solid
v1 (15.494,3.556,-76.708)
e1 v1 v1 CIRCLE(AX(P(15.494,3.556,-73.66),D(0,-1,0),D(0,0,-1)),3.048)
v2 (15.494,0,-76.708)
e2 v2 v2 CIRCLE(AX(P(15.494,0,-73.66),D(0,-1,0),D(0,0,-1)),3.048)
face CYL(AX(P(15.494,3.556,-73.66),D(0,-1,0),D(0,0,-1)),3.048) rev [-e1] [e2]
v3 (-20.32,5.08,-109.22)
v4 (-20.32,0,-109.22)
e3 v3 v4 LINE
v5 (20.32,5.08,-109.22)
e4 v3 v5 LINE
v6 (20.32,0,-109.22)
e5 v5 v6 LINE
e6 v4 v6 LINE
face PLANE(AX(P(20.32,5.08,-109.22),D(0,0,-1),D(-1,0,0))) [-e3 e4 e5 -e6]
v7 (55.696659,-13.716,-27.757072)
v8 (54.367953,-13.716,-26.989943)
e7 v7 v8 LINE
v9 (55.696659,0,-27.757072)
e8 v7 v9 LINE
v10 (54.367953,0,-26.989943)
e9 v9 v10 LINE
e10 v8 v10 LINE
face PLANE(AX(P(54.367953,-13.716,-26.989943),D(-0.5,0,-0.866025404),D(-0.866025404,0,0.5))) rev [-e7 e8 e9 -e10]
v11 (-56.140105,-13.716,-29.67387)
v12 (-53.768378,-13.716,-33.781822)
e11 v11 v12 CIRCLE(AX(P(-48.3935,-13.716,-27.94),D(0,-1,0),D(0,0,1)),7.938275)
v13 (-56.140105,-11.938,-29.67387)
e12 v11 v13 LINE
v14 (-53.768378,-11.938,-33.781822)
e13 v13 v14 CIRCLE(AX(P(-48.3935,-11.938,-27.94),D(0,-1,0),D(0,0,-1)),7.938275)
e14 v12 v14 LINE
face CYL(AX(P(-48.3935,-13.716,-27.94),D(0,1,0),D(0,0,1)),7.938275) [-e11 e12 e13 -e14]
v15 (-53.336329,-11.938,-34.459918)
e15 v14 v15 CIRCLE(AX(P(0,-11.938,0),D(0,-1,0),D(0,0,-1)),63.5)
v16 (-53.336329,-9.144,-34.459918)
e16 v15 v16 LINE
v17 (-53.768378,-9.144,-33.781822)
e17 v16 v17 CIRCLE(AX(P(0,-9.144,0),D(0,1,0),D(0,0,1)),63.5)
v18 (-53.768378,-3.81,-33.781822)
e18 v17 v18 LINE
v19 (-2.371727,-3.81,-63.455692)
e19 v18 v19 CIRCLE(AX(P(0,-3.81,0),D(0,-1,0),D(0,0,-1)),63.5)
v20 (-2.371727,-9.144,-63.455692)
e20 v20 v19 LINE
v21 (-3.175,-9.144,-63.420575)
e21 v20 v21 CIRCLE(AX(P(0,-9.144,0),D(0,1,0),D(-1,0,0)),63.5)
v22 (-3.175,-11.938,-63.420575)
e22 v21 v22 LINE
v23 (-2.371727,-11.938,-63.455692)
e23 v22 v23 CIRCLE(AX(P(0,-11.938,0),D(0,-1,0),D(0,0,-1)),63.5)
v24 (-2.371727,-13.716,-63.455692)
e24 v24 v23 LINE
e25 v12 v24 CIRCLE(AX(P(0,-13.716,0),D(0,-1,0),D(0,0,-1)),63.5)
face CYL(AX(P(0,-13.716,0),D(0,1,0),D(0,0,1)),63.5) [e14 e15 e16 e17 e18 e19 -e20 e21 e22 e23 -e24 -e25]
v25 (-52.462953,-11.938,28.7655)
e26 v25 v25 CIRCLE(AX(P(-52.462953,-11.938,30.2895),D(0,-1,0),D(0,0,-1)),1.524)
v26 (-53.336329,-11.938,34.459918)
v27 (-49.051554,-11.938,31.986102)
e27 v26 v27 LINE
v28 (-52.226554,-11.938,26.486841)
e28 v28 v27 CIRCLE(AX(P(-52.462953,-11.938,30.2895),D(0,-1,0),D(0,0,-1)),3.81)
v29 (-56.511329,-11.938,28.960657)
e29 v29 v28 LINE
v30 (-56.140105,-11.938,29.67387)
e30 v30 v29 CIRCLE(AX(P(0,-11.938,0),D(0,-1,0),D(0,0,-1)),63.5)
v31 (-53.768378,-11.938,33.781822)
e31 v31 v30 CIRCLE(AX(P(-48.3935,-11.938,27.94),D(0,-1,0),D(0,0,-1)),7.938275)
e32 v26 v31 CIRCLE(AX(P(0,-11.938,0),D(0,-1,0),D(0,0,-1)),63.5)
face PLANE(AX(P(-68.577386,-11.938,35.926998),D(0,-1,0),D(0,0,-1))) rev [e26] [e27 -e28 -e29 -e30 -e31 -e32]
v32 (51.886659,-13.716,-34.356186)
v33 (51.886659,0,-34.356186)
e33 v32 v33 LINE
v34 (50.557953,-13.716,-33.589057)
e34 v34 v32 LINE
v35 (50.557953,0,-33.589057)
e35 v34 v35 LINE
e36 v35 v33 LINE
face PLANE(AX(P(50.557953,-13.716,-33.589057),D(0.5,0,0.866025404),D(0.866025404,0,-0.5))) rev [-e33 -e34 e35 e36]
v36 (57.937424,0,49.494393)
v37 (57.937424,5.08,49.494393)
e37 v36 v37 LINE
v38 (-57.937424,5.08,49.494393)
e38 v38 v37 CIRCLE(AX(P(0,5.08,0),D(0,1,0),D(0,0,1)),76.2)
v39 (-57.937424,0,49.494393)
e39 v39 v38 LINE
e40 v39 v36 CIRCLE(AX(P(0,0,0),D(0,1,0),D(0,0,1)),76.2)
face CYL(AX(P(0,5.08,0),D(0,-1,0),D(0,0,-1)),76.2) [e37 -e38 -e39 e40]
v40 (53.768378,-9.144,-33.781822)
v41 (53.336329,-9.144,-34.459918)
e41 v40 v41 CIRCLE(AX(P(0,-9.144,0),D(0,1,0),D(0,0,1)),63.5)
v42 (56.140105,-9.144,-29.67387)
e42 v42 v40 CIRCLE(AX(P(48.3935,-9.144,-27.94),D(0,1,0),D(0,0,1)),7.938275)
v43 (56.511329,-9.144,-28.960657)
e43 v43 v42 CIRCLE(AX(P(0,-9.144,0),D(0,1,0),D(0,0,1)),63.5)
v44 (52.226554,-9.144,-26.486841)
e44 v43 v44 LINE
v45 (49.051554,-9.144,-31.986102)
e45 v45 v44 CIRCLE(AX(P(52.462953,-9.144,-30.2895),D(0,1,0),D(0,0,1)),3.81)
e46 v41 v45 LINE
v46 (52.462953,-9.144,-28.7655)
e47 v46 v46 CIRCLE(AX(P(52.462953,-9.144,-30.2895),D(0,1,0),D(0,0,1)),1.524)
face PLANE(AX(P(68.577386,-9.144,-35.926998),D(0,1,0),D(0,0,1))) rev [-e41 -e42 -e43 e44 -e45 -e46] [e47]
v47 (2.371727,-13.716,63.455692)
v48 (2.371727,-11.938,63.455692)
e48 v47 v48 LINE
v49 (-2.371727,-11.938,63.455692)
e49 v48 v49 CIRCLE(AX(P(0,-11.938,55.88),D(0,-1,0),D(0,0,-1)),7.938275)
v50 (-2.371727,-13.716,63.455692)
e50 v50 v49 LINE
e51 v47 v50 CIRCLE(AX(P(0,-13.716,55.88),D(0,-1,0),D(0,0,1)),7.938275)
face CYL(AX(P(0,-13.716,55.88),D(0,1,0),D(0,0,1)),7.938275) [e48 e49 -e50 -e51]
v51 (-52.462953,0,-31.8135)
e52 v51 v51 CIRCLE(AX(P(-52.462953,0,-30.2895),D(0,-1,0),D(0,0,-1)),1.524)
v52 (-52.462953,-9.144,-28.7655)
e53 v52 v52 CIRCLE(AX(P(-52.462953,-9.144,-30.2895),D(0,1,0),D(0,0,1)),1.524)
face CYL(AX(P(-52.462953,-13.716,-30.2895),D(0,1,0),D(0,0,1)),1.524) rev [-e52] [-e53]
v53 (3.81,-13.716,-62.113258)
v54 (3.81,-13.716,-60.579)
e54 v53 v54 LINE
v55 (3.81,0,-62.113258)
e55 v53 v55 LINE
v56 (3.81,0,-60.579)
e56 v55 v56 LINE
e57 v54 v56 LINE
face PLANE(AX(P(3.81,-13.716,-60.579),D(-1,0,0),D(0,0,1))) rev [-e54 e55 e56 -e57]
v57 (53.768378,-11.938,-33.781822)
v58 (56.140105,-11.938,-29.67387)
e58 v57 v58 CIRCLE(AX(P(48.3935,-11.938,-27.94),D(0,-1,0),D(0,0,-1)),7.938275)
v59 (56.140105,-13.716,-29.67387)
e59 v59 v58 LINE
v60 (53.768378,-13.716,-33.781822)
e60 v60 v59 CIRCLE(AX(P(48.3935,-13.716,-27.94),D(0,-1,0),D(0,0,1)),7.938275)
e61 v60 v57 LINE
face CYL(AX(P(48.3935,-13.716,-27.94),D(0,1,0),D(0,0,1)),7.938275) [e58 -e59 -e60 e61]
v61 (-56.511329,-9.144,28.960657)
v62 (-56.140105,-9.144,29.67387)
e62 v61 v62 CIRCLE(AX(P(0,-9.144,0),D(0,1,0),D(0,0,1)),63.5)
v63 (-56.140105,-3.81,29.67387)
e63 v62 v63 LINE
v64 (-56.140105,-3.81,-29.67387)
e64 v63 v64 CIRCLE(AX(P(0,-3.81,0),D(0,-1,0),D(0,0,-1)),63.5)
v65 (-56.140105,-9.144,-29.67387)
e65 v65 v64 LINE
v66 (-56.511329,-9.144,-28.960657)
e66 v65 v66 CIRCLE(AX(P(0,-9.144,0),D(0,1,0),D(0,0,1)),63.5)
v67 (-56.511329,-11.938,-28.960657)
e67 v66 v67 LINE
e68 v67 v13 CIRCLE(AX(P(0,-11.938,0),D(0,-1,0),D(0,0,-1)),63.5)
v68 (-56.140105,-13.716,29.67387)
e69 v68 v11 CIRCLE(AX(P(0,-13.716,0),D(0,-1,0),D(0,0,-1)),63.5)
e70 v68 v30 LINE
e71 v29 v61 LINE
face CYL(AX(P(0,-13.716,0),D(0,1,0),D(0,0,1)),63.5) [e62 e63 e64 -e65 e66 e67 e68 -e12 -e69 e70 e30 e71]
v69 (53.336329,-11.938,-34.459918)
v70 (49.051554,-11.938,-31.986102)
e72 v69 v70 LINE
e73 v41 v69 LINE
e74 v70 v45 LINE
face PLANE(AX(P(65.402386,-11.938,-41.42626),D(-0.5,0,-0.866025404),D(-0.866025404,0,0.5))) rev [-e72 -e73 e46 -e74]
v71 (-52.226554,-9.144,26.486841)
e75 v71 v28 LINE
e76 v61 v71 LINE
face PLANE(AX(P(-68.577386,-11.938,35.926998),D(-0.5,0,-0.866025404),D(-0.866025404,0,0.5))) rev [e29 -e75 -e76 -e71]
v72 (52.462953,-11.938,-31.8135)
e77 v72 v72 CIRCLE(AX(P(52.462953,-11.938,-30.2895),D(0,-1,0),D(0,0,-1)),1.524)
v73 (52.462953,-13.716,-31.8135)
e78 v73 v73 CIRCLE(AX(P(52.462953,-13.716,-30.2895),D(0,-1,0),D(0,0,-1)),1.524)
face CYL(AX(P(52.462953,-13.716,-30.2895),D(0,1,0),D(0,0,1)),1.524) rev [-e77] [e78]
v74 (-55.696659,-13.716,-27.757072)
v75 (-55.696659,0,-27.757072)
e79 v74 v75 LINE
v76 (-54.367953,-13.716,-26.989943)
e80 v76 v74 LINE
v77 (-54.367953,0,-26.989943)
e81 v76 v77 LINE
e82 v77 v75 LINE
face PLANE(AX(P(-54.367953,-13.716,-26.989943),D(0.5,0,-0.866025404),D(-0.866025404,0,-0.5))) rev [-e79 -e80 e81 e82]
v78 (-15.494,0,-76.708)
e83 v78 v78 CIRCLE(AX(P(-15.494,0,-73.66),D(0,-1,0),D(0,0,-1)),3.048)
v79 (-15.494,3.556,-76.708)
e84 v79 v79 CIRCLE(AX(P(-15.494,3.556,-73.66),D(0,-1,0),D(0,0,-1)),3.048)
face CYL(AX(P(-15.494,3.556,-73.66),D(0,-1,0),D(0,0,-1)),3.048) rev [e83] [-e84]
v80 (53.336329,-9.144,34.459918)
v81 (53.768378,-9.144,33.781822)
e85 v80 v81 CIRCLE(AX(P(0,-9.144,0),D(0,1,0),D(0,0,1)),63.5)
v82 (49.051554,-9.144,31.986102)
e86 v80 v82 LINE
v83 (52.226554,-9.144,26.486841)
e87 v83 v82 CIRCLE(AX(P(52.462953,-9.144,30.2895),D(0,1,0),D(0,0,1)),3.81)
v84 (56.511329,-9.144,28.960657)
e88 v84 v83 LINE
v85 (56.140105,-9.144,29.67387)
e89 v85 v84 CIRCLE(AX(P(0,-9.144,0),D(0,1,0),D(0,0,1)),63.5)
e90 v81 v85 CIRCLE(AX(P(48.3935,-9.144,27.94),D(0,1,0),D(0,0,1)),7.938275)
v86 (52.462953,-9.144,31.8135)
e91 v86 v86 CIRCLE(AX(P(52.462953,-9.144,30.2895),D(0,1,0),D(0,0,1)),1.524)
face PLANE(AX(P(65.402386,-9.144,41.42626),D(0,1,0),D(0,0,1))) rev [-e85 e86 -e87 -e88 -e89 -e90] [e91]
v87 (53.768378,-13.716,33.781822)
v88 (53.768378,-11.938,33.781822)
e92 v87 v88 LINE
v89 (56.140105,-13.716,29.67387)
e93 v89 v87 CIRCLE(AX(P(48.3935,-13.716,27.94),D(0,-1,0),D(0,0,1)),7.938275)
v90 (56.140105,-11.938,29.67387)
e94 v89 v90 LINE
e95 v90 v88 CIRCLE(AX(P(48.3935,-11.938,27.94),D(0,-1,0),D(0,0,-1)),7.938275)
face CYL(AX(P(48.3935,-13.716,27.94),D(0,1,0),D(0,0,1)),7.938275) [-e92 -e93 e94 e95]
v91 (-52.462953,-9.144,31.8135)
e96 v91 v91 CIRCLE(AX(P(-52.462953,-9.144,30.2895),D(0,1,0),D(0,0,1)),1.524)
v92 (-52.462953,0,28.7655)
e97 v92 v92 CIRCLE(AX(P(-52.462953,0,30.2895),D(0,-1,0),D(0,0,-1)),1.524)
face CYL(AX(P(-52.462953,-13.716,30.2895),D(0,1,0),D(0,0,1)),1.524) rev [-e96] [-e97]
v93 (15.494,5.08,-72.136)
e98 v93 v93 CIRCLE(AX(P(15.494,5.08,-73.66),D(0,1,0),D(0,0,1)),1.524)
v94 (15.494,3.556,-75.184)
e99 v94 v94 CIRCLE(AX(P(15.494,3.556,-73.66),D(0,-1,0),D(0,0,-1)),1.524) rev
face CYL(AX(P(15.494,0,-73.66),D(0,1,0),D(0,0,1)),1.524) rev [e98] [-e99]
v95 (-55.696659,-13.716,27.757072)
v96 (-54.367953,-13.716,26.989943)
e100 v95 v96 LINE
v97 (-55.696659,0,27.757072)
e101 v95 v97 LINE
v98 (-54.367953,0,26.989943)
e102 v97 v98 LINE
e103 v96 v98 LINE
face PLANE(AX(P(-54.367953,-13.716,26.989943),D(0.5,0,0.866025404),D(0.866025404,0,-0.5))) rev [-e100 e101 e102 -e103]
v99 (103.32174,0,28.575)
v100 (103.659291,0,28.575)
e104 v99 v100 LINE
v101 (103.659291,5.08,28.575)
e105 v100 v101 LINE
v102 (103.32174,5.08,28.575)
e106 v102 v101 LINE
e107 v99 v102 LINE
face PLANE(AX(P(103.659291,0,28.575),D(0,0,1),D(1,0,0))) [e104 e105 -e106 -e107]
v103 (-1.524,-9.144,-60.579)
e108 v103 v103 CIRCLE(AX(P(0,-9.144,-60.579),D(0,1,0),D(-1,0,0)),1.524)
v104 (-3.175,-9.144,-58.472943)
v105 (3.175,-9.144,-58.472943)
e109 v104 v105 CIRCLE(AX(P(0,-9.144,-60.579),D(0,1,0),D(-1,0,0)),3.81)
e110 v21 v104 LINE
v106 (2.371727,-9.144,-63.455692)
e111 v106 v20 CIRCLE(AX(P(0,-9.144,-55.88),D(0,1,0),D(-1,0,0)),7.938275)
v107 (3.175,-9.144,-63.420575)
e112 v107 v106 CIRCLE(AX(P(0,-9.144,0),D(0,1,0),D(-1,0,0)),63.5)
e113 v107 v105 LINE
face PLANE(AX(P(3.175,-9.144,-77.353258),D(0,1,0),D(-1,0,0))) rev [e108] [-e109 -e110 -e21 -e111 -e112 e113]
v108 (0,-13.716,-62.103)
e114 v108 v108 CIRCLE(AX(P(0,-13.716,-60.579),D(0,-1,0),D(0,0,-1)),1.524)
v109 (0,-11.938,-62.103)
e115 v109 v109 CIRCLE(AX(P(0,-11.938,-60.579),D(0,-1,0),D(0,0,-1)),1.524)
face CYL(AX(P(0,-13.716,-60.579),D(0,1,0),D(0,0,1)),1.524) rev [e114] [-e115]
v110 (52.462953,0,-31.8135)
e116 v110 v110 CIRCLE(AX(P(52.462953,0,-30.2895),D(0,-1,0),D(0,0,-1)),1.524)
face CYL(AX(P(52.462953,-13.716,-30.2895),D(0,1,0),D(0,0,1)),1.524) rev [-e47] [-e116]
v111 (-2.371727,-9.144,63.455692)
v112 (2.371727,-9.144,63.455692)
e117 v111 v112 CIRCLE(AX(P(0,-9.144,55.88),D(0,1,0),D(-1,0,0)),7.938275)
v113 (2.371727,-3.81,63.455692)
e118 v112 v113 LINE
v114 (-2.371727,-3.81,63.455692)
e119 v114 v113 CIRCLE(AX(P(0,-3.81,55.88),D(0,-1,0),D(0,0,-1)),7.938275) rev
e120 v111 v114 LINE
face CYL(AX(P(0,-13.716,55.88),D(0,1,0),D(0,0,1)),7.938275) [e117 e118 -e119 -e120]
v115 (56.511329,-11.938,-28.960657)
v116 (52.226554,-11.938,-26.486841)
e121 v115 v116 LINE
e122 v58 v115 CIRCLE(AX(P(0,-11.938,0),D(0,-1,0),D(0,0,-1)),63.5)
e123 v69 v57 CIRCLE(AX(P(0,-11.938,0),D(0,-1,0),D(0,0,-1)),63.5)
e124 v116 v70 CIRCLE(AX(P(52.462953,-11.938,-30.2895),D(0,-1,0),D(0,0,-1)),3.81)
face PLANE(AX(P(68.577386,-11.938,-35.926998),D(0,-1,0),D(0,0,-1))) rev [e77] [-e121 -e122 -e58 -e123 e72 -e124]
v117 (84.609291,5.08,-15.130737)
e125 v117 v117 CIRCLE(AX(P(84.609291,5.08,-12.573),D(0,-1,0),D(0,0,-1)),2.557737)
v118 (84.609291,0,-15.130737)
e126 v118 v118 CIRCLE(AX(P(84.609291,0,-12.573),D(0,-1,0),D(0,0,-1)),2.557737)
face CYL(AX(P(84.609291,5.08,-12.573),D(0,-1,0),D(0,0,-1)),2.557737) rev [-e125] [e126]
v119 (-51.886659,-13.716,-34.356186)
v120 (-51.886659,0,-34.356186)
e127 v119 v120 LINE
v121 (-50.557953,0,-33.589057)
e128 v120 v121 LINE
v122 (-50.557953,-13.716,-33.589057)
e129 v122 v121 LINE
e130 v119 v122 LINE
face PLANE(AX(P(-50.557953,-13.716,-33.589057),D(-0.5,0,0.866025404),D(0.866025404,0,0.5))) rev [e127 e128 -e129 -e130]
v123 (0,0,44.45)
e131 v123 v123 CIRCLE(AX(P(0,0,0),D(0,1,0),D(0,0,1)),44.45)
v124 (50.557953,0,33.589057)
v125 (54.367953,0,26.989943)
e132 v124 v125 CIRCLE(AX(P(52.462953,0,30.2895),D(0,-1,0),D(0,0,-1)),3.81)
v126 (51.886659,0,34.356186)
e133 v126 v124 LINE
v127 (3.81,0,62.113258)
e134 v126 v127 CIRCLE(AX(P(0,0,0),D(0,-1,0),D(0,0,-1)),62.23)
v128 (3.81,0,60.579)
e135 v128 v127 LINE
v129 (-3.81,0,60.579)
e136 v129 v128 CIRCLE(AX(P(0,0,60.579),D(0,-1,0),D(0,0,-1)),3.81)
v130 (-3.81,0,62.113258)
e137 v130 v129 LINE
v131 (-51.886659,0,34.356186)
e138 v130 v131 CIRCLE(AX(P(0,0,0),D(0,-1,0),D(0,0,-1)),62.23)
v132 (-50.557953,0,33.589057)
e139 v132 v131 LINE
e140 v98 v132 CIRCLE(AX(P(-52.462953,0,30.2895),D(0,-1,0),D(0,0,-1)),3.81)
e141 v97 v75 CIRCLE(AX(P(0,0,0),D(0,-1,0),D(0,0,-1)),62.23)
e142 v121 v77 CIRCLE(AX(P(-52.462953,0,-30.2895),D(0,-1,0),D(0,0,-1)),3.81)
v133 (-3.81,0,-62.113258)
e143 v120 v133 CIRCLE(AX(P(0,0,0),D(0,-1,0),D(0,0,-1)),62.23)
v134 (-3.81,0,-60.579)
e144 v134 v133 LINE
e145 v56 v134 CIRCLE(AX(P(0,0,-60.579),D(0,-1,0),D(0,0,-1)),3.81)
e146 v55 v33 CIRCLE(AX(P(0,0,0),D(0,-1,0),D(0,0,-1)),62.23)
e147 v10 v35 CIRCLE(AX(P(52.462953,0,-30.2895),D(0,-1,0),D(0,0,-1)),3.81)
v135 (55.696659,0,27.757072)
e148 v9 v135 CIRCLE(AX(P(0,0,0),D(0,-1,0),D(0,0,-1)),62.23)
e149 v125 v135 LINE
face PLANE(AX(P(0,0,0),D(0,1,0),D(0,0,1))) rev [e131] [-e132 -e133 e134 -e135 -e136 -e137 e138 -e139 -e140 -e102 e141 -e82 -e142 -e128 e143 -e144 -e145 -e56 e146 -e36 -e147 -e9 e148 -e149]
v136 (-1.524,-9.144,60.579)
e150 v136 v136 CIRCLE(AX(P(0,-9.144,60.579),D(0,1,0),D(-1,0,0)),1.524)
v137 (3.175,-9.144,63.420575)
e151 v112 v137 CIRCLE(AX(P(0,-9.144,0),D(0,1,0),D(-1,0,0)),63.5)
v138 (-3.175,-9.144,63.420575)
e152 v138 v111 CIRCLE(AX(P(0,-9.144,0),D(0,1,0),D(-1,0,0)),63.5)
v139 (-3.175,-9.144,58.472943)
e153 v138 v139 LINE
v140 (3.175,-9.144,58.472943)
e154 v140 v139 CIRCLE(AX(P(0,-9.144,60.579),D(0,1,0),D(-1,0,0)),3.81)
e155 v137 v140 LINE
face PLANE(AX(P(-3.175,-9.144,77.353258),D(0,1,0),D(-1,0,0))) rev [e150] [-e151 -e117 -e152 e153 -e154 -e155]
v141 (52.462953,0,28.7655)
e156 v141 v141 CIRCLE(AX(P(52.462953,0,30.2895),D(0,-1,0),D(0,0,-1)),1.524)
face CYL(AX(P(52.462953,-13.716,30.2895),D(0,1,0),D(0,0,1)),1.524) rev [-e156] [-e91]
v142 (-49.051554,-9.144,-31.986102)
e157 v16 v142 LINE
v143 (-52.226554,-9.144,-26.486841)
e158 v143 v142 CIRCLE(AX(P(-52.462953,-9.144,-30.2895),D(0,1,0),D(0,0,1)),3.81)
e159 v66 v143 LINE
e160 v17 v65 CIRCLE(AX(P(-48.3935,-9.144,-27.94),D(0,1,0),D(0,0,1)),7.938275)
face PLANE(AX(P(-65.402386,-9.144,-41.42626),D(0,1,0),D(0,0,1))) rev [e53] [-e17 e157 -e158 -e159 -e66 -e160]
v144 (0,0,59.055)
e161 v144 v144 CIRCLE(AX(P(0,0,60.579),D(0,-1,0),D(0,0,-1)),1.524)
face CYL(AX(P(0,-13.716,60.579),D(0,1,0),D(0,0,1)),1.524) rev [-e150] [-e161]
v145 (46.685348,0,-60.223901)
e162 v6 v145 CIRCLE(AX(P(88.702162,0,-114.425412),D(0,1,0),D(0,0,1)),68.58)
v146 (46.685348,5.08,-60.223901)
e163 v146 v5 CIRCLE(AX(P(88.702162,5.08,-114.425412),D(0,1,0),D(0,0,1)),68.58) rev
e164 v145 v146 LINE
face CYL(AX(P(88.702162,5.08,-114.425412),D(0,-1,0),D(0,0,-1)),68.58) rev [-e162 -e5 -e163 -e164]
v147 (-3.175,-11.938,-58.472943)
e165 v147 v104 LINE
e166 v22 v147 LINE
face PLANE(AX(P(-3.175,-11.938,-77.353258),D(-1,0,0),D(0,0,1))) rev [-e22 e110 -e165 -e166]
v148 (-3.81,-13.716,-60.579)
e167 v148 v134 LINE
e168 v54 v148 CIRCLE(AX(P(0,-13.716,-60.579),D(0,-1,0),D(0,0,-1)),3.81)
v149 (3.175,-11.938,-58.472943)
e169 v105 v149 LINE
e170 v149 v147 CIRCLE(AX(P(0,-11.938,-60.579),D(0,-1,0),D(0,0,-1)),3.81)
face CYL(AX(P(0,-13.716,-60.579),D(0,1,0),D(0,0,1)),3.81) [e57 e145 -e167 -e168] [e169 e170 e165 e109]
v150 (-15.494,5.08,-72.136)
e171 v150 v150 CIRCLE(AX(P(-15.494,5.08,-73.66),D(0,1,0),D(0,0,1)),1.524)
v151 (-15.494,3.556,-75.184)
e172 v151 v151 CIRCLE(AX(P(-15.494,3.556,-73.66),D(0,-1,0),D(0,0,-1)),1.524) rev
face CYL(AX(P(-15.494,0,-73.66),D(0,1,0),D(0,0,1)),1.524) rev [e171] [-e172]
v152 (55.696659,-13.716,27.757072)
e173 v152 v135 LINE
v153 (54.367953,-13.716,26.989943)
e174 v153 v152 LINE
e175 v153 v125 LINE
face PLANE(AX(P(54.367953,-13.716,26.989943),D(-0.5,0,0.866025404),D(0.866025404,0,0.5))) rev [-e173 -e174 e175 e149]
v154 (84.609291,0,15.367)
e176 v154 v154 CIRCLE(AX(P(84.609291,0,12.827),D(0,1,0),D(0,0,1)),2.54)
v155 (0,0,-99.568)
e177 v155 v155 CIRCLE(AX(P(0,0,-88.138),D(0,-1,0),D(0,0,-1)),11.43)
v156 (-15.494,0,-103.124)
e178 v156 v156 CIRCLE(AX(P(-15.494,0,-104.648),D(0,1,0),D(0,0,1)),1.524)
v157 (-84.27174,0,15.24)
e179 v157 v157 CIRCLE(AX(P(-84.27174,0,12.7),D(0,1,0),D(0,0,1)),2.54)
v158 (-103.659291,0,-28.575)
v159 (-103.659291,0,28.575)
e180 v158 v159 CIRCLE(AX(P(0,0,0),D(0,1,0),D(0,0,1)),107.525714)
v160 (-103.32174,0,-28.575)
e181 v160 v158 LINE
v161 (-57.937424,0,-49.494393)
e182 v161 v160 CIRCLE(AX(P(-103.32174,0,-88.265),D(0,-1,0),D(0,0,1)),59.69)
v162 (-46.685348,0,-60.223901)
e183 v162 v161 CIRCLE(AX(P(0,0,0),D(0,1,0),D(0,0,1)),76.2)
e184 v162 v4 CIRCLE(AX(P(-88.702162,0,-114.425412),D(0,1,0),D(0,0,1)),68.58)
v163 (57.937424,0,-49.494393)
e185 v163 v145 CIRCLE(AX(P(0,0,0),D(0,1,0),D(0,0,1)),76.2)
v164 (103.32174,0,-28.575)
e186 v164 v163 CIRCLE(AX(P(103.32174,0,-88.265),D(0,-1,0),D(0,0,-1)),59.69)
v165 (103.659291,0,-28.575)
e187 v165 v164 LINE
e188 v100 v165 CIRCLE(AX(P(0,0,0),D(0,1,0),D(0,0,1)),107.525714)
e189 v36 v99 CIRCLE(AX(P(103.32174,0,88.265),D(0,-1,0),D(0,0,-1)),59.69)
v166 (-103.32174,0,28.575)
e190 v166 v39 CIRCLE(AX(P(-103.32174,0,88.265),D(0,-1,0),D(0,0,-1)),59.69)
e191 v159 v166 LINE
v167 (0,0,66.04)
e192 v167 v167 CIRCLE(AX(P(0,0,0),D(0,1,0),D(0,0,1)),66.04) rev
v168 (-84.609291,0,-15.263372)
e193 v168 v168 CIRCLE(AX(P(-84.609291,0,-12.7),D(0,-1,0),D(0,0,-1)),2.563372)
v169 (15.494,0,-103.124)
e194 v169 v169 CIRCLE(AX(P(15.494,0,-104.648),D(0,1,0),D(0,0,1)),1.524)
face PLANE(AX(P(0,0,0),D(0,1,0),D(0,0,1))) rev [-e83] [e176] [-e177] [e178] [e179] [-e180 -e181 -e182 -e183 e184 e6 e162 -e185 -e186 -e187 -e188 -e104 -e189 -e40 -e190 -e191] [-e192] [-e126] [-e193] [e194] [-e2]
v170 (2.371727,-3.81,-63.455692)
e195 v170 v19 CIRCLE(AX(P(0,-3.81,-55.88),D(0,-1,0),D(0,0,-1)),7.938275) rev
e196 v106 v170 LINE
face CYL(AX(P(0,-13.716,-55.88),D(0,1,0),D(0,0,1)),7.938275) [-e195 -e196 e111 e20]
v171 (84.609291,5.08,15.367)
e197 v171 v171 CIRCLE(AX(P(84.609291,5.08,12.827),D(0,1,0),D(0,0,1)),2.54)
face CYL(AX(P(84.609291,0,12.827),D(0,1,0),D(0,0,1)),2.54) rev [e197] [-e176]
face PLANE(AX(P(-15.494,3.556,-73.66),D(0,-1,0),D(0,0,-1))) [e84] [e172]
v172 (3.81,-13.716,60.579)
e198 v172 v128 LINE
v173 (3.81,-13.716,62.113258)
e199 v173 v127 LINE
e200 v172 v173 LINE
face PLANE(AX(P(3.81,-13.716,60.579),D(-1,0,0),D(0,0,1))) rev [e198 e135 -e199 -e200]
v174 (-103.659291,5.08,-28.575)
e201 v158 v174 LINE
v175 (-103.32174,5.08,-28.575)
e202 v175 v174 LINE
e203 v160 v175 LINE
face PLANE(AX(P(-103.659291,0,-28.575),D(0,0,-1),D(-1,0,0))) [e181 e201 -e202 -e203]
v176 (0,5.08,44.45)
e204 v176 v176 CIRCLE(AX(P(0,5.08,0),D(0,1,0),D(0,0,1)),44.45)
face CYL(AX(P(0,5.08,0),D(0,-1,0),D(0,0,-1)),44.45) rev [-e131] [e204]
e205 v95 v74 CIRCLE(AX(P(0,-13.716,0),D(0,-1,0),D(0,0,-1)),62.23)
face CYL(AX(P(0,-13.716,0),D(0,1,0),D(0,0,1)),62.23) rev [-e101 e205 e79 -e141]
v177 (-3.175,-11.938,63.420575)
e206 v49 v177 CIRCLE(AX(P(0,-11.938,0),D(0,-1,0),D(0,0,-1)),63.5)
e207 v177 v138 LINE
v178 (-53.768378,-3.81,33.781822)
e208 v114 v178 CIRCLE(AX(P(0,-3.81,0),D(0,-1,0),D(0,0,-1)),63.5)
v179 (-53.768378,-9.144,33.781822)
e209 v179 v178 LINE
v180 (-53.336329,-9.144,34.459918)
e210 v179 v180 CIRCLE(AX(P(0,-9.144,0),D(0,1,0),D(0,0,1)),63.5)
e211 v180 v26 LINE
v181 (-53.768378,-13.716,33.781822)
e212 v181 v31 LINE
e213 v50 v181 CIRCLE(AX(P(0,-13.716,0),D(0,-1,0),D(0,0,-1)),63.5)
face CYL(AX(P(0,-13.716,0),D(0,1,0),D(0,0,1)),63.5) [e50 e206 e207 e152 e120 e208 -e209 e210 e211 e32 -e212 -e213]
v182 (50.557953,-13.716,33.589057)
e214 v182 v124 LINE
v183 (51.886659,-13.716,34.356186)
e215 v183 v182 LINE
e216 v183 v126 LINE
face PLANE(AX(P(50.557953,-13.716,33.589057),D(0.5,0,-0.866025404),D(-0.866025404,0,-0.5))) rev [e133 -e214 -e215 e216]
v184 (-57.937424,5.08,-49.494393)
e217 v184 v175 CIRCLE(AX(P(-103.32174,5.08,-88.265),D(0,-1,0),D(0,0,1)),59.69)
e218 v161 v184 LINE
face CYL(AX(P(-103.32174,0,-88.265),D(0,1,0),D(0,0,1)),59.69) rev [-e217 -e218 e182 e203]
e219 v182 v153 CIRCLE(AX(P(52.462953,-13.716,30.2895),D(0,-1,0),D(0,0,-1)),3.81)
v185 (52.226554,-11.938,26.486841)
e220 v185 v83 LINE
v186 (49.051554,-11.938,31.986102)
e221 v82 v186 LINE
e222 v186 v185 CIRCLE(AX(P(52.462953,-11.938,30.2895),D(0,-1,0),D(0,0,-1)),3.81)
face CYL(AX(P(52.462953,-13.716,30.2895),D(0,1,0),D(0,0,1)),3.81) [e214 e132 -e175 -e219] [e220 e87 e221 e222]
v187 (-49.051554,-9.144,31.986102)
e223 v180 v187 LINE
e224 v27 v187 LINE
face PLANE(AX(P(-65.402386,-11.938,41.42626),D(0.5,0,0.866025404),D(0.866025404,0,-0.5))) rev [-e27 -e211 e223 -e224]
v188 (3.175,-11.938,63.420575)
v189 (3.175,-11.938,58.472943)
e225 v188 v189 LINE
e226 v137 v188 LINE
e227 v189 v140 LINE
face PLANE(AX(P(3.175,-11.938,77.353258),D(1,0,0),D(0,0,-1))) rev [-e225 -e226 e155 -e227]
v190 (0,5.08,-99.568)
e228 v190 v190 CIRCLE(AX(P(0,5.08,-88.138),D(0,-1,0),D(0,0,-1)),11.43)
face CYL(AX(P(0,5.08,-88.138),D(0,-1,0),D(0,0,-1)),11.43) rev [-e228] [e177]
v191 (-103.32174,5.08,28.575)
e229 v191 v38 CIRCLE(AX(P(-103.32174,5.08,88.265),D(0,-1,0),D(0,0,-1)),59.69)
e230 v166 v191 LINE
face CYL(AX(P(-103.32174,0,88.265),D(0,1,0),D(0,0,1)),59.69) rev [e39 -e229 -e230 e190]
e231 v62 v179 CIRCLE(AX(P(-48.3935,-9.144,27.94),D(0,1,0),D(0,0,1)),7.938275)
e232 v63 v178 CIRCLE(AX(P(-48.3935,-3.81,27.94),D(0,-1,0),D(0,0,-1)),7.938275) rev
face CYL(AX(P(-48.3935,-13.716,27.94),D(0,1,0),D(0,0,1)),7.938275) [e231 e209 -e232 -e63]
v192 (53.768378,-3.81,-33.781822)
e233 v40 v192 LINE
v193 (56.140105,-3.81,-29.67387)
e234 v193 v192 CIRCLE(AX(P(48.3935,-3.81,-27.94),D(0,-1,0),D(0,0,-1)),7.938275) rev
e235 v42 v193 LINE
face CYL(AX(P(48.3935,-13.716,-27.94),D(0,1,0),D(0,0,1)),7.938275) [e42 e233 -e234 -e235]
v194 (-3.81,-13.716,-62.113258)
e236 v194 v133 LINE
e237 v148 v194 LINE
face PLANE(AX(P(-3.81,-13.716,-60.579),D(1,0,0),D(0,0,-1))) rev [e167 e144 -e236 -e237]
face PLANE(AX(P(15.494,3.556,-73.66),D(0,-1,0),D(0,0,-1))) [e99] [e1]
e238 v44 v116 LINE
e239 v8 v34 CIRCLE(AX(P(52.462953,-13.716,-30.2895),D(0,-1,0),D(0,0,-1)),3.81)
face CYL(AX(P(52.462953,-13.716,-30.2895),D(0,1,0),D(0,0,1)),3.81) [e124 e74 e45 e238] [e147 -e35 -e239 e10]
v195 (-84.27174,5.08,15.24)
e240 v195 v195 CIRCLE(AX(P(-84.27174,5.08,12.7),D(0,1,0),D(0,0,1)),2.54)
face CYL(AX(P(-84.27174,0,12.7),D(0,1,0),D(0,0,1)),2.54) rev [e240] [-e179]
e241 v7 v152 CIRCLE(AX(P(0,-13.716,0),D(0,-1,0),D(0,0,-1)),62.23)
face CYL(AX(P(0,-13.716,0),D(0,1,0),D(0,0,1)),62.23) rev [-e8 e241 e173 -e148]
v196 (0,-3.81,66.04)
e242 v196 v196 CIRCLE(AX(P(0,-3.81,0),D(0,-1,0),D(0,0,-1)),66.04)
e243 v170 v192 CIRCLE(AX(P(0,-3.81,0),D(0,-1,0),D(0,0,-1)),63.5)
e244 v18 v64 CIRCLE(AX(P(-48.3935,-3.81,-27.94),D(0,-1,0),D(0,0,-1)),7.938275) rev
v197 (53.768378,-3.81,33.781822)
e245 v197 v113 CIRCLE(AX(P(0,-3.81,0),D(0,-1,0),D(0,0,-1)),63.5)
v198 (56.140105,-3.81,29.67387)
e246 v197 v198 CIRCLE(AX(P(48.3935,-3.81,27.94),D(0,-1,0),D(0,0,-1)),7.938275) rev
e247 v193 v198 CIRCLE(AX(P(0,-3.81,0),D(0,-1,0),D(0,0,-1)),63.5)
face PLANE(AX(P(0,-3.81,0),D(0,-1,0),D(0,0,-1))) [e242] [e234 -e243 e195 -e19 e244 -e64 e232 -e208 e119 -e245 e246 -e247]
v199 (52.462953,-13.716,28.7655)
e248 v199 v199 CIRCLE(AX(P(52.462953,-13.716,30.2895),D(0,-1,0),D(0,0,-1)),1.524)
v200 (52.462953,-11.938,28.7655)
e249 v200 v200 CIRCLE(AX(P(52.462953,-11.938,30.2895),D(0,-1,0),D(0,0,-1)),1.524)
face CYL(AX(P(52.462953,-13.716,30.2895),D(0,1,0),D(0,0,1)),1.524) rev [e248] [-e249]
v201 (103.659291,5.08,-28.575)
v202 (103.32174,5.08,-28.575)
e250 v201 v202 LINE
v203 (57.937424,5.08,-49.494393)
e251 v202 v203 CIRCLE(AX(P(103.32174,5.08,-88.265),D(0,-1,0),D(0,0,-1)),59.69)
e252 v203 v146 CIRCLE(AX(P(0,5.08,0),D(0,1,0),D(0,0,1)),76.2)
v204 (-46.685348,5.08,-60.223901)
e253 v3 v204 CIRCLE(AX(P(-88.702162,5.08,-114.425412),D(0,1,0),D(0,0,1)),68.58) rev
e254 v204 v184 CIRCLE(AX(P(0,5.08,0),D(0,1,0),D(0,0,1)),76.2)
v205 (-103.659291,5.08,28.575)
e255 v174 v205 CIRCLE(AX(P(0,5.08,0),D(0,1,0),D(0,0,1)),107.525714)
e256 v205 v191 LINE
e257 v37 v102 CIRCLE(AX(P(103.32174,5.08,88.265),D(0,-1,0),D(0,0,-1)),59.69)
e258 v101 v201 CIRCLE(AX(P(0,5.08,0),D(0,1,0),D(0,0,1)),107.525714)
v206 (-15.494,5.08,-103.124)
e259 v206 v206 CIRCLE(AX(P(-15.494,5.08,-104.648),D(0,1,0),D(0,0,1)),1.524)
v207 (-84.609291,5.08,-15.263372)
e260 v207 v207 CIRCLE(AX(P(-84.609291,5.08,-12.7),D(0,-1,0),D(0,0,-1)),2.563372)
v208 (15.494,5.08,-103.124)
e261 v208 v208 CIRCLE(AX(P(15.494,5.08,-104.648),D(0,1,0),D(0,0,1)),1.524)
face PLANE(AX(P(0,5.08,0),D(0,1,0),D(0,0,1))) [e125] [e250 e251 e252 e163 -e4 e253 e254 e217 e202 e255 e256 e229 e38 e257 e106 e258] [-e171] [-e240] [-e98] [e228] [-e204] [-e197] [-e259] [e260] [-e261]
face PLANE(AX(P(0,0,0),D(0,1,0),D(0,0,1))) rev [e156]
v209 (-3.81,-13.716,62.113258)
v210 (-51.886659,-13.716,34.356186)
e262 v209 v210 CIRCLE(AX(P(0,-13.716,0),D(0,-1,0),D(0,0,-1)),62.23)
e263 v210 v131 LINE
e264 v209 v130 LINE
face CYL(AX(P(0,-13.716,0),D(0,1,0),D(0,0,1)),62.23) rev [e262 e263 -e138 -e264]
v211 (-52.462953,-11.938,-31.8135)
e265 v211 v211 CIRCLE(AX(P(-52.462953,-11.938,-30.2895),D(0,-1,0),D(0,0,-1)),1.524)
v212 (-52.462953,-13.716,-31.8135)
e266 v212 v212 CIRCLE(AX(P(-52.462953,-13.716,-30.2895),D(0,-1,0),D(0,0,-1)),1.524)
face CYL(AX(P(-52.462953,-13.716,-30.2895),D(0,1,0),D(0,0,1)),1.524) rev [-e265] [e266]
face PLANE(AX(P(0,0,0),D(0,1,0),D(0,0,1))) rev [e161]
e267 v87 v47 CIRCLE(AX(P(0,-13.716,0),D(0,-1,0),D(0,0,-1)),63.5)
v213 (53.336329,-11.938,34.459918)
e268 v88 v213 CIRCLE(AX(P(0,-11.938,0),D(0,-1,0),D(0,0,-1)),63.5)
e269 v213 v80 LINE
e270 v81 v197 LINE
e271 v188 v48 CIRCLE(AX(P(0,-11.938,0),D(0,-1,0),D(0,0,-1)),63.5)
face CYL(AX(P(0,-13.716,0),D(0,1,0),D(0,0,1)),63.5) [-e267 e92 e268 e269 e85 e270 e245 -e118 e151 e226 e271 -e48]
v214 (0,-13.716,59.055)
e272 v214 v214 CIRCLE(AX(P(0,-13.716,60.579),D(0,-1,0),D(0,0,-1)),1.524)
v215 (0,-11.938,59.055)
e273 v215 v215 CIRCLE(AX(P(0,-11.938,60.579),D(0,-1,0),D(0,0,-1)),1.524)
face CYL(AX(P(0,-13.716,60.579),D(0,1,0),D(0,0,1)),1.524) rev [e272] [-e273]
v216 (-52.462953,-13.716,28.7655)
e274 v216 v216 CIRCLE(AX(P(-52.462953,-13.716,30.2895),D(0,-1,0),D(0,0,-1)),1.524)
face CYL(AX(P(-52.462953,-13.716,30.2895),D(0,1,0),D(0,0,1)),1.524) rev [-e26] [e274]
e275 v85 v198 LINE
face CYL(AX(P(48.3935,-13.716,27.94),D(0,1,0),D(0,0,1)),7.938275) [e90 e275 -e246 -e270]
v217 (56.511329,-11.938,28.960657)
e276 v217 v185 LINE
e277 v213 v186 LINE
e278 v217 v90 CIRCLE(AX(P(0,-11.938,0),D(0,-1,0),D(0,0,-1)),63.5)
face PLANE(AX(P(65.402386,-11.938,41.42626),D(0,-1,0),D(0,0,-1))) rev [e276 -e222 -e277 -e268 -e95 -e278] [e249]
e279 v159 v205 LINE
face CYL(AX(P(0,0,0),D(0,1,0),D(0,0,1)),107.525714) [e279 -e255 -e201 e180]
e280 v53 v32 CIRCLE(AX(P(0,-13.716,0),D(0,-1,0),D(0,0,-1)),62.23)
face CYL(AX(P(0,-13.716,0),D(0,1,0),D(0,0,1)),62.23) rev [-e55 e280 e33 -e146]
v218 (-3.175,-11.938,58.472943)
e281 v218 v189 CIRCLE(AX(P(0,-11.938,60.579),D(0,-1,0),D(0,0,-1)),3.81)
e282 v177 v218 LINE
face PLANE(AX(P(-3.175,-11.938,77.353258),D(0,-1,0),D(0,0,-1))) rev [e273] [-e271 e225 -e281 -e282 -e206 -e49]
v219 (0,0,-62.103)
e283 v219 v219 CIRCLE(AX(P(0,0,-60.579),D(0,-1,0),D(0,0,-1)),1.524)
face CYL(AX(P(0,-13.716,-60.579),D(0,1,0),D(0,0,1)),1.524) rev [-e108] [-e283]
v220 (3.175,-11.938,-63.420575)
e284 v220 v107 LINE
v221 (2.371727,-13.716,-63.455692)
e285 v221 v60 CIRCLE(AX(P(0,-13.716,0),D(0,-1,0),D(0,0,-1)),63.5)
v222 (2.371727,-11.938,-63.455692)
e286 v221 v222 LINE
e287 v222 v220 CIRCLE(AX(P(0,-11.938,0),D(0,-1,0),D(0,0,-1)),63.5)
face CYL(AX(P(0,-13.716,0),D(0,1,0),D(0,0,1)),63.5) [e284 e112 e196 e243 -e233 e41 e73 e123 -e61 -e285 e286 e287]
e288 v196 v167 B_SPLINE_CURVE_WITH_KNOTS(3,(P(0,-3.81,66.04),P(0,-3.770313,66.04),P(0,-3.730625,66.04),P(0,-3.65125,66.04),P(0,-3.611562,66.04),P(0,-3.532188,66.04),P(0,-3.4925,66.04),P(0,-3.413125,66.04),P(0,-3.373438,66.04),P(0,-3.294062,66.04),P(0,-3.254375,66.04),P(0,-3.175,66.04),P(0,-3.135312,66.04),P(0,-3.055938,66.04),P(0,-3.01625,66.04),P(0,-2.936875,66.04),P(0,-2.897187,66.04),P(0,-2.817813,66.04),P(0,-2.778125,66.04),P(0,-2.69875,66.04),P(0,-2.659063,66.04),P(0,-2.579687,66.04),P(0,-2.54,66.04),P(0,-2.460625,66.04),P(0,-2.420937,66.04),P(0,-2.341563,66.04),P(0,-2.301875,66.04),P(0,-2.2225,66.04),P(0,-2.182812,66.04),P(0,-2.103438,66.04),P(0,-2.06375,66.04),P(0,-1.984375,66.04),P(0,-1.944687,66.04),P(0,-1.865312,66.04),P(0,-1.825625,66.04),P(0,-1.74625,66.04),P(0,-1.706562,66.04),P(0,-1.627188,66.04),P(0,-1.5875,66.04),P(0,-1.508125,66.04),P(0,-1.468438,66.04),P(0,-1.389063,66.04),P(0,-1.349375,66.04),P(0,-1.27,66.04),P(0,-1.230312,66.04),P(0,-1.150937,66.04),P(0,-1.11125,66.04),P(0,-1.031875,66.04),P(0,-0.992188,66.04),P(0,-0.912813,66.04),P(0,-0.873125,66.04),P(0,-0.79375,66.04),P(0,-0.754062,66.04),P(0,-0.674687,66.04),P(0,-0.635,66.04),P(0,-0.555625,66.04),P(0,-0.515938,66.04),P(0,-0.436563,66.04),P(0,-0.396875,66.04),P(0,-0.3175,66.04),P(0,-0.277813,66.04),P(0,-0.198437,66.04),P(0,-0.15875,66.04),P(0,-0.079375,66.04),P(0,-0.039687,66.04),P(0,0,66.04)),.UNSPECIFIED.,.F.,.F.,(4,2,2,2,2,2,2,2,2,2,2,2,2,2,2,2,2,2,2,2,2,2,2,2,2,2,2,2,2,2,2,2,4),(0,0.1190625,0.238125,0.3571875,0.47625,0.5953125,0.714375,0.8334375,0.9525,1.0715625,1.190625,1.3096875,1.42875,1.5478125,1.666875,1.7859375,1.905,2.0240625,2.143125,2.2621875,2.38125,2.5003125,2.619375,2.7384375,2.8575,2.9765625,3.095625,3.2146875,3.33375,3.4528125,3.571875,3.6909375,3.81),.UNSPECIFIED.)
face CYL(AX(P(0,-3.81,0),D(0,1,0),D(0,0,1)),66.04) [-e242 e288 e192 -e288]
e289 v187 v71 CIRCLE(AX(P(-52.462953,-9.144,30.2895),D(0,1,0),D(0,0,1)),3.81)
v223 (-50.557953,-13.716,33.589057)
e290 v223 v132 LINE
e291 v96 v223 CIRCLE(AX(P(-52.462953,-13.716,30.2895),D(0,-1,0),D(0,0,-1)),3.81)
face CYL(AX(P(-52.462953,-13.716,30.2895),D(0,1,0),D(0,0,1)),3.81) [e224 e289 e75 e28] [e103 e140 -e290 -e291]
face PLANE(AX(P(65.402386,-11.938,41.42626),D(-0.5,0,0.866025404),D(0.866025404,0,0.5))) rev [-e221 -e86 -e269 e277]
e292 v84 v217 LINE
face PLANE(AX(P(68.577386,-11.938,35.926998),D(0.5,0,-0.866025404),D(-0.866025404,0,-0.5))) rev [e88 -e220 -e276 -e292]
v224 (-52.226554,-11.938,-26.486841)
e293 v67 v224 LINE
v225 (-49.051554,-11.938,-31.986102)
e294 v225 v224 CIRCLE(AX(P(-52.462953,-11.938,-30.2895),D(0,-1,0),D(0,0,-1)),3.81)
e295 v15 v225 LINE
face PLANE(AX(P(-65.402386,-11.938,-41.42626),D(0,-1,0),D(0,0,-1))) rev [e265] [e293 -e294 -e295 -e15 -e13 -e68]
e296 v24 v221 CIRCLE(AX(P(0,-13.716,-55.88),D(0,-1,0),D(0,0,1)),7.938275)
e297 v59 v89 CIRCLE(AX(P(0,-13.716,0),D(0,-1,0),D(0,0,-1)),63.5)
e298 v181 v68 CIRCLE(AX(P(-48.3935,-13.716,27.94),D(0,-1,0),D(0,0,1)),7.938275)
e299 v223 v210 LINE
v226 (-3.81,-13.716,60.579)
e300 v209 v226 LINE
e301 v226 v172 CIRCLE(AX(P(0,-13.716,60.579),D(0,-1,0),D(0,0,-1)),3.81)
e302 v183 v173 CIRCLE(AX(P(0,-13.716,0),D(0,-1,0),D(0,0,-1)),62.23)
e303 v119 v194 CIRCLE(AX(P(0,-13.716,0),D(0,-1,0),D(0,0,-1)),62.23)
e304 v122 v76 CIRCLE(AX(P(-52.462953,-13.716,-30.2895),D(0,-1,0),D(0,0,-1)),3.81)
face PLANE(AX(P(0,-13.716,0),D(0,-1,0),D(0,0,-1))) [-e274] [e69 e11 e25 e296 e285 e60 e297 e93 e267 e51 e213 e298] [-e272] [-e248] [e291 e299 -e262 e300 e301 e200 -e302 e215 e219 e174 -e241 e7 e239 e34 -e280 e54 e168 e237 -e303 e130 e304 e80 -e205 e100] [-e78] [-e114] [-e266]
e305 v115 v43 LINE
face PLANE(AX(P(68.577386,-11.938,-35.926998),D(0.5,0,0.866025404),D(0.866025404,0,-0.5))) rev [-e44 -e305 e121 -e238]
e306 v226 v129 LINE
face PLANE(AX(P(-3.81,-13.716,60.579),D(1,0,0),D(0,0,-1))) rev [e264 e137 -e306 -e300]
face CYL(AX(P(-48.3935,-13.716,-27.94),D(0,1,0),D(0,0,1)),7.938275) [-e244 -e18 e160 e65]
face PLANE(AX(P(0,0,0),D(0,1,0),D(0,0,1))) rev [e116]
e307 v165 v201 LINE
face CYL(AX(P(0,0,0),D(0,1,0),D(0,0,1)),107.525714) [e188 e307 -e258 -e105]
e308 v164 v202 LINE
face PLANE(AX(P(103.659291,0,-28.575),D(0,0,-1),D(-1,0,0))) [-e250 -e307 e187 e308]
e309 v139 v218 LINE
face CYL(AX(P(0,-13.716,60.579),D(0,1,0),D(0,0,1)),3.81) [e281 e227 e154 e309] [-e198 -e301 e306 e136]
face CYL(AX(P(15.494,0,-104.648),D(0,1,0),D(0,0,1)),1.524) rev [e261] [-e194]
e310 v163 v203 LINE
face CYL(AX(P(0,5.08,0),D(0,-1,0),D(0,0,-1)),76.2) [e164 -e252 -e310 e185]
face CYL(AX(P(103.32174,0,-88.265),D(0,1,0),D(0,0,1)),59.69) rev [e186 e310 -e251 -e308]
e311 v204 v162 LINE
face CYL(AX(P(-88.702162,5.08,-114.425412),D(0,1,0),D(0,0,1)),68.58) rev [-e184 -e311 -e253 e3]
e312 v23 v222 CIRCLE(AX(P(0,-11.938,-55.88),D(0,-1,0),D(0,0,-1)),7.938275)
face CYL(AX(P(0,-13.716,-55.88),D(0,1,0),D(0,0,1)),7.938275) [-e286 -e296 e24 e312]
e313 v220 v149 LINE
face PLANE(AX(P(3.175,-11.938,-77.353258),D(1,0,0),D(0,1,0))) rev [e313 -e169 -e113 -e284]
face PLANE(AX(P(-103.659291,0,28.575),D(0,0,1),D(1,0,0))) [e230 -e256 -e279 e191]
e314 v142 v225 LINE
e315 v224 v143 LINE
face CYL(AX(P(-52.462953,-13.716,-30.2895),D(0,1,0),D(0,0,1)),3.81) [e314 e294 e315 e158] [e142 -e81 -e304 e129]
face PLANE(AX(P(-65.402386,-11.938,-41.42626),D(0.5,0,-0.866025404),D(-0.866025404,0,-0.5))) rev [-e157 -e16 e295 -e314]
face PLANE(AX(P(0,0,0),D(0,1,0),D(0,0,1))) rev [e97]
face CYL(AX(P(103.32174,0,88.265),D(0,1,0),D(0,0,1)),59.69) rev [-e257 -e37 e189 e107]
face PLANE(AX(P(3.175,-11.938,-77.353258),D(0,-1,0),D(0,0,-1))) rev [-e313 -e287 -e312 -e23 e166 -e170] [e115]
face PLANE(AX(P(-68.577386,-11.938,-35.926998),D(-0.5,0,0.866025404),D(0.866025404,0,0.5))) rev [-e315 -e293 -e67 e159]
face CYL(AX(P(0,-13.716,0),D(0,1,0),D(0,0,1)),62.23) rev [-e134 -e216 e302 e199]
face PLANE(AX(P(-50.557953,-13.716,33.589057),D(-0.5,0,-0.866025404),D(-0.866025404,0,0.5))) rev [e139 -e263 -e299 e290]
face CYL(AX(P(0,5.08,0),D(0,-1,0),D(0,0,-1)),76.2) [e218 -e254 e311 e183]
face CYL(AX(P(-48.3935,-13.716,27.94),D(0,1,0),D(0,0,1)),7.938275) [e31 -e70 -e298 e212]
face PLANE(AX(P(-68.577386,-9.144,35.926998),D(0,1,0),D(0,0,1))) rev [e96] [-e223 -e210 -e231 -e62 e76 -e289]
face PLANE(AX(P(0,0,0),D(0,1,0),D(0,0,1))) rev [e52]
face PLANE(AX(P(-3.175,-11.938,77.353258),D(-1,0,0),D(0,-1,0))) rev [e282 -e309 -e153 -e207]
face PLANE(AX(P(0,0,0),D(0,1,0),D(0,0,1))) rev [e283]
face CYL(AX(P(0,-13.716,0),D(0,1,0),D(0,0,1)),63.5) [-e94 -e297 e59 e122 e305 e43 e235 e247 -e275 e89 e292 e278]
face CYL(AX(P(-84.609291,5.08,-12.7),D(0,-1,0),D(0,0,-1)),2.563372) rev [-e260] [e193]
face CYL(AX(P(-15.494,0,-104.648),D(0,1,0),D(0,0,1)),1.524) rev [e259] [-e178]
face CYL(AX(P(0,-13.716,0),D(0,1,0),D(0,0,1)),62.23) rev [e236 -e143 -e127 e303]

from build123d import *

# Parameters (mm, degrees)
SKETCH1_R            = 76.2
SKETCH1_R_2          = 44.45
BOSS_EXTRUDE1_DEPTH  = 5.08
BOSS_EXTRUDE12_DEPTH = 5.08
SKETCH7_R            = 44.45
BOSS_EXTRUDE13_DEPTH = 5.08
SKETCH8_R            = 2.54
CUT_EXTRUDE1_DEPTH   = 132.886411546
SKETCH11_R           = 2.55773741
SKETCH11_R_2         = 2.443934978
SKETCH11_R_3         = 2.44571327
SKETCH11_R_4         = 2.563372012
CUT_EXTRUDE2_DEPTH   = 132.886411546
SKETCH12_R           = 63.5
SKETCH12_R_2         = 62.23
BOSS_EXTRUDE15_DEPTH = 13.716
SKETCH13_R           = 66.04
SKETCH13_R_2         = 63.5
BOSS_EXTRUDE16_DEPTH = 3.81
SKETCH14_W           = 40.64
SKETCH14_H           = 44.45
SKETCH14_R           = 11.43
BOSS_EXTRUDE17_DEPTH = 5.08
CUT_EXTRUDE3_START   = -5.08
SKETCH15_R           = 11.43
SKETCH15_R_2         = 1.524
CUT_EXTRUDE3_DEPTH   = 5.08
BOSS_EXTRUDE19_DEPTH = 13.716
SKETCH18_R           = 1.524
BOSS_EXTRUDE20_DEPTH = 13.716
SKETCH19_W           = 6.35
SKETCH19_H           = 2.794
CUT_EXTRUDE4_DEPTH   = 15.24
CIRPATTERN1_COUNT    = 6
SKETCH21_R           = 3.048
CUT_EXTRUDE6_DEPTH   = 3.556
FILLET2_R            = 68.58


with BuildPart() as part:
    # Sketch1 → Boss-Extrude1 (new body)
    with BuildSketch(Plane(origin=(0, 0, 0), x_dir=(1, 0, 0), z_dir=(0, 1, 0))):
        with Locations(Location((0, 0, 0), (0, 0, 270))):
            Circle(SKETCH1_R)
        with Locations(Location((0, 0, 0), (0, 0, 270))):
            Circle(SKETCH1_R_2, mode=Mode.SUBTRACT)
    extrude(amount=BOSS_EXTRUDE1_DEPTH)

    # Sketch6 → Boss-Extrude12 (add, through all)
    with BuildSketch(Plane(origin=(0, 5.08, 0), x_dir=(1, 0, 0), z_dir=(0, 1, 0))):
        with BuildLine():
            Line((-103.65929059, 28.575), (-70.63929059, 28.575))
            ThreePointArc((-70.63929059, 28.575), (-76.2, 0), (-70.63929059, -28.575))
            Line((-70.63929059, -28.575), (-103.65929059, -28.575))
            ThreePointArc((-103.65929059, -28.575), (-107.525713904, 0), (-103.65929059, 28.575))
        make_face()
        with BuildLine():
            Line((103.65929059, -28.575), (70.63929059, -28.575))
            ThreePointArc((70.63929059, -28.575), (76.2, 0), (70.63929059, 28.575))
            Line((70.63929059, 28.575), (103.65929059, 28.575))
            ThreePointArc((103.65929059, 28.575), (107.525713904, 0), (103.65929059, -28.575))
        make_face()
    extrude(amount=-BOSS_EXTRUDE12_DEPTH)

    # Sketch7 → Boss-Extrude13 (add, through all)
    with BuildSketch(Plane(origin=(0, 5.08, 0), x_dir=(1, 0, 0), z_dir=(0, 1, 0))):
        with BuildLine():
            Line((-103.65929059, 28.575), (-103.321739605, 28.575))
            ThreePointArc((-103.321739605, 28.575), (-78.334957702, 34.056542817), (-57.937424078, 49.494392523))
            ThreePointArc((-57.937424078, 49.494392523), (0, 76.2), (57.937424078, 49.494392523))
            ThreePointArc((57.937424078, 49.494392523), (78.334957702, 34.056542817), (103.321739605, 28.575))
            Line((103.321739605, 28.575), (103.65929059, 28.575))
            Line((103.65929059, 28.575), (103.65929059, -28.575))
            Line((103.65929059, -28.575), (103.321739605, -28.575))
            ThreePointArc((103.321739605, -28.575), (78.334957702, -34.056542817), (57.937424078, -49.494392523))
            ThreePointArc((57.937424078, -49.494392523), (0, -76.2), (-57.937424078, -49.494392523))
            ThreePointArc((-57.937424078, -49.494392523), (-78.334957702, -34.056542817), (-103.321739605, -28.575))
            Line((-103.321739605, -28.575), (-103.65929059, -28.575))
            Line((-103.65929059, -28.575), (-103.65929059, 28.575))
        make_face()
        with Locations(Location((0, 0, 0), (0, 0, 270))):
            Circle(SKETCH7_R, mode=Mode.SUBTRACT)
    extrude(amount=-BOSS_EXTRUDE13_DEPTH)

    # Sketch8 → Cut-Extrude1 (cut, through all)
    with BuildSketch(Plane(origin=(0, 5.08, 0), x_dir=(1, 0, 0), z_dir=(0, 1, 0))):
        with Locations(Location((-84.60929059, 12.7, 0), (0, 0, 270))):
            Circle(SKETCH8_R)
        with Locations(Location((-84.271739605, -12.7, 0), (0, 0, 270))):
            Circle(SKETCH8_R)
        with Locations(Location((84.60929059, 12.573, 0), (0, 0, 270))):
            Circle(SKETCH8_R)
        with Locations(Location((84.60929059, -12.827, 0), (0, 0, 270))):
            Circle(SKETCH8_R)
    extrude(amount=-CUT_EXTRUDE1_DEPTH, mode=Mode.SUBTRACT)

    # Sketch11 → Cut-Extrude2 (cut, through all)
    with BuildSketch(Plane.XZ):
        with Locations(Location((84.60929059, -12.573, 0), (0, 0, 270))):
            Circle(SKETCH11_R)
        with Locations((84.60929059, 12.827)):
            Circle(SKETCH11_R_2)
        with Locations((-84.271739605, 12.7)):
            Circle(SKETCH11_R_3)
        with Locations(Location((-84.60929059, -12.7, 0), (0, 0, 270))):
            Circle(SKETCH11_R_4)
    extrude(amount=-CUT_EXTRUDE2_DEPTH, mode=Mode.SUBTRACT)

    # Sketch12 → Boss-Extrude15 (add)
    with BuildSketch(Plane.XZ):
        with Locations(Location((0, 0, 0), (0, 0, 90))):
            Circle(SKETCH12_R)
        with Locations(Location((0, 0, 0), (0, 0, 270))):
            Circle(SKETCH12_R_2, mode=Mode.SUBTRACT)
    extrude(amount=BOSS_EXTRUDE15_DEPTH)

    # Sketch13 → Boss-Extrude16 (add)
    with BuildSketch(Plane.XZ):
        with Locations(Location((0, 0, 0), (0, 0, 90))):
            Circle(SKETCH13_R)
        with Locations(Location((0, 0, 0), (0, 0, 270))):
            Circle(SKETCH13_R_2, mode=Mode.SUBTRACT)
    extrude(amount=BOSS_EXTRUDE16_DEPTH)

    # Sketch14 → Boss-Extrude17 (add)
    with BuildSketch(Plane.XZ):
        with Locations((0, -86.995)):
            Rectangle(SKETCH14_W, SKETCH14_H)
        with Locations(Location((0, -88.138, 0), (0, 0, 270))):
            Circle(SKETCH14_R, mode=Mode.SUBTRACT)
    extrude(amount=-BOSS_EXTRUDE17_DEPTH)

    # Sketch15 → Cut-Extrude3 (cut)
    with BuildSketch(Plane(origin=(0, 5.08, 0), x_dir=(1, 0, 0), z_dir=(0, 1, 0)).offset(CUT_EXTRUDE3_START)):
        with Locations(Location((0, 88.138, 0), (0, 0, 90))):
            Circle(SKETCH15_R)
        with Locations(Location((-15.494, 104.648, 0), (0, 0, 270))):
            Circle(SKETCH15_R_2)
        with Locations(Location((15.494, 104.648, 0), (0, 0, 270))):
            Circle(SKETCH15_R_2)
        with Locations(Location((15.494, 73.66, 0), (0, 0, 270))):
            Circle(SKETCH15_R_2)
        with Locations(Location((-15.494, 73.66, 0), (0, 0, 270))):
            Circle(SKETCH15_R_2)
    extrude(amount=CUT_EXTRUDE3_DEPTH, mode=Mode.SUBTRACT)

    # Sketch17 → Boss-Extrude19 (add, through all)
    with BuildSketch(Plane.XZ):
        with BuildLine():
            ThreePointArc((53.768378144, -33.781822209), (54.99261314, -31.75), (56.140105291, -29.673870289))
            ThreePointArc((56.140105291, -29.673870289), (55.268247185, -31.90913739), (53.768378144, -33.781822209))
        make_face()
        with BuildLine():
            ThreePointArc((2.371727147, -63.455692498), (0, -63.81827478), (-2.371727147, -63.455692498))
            ThreePointArc((-2.371727147, -63.455692498), (0, -63.5), (2.371727147, -63.455692498))
        make_face()
        with BuildLine():
            ThreePointArc((-53.768378144, -33.781822209), (-55.268247185, -31.90913739), (-56.140105291, -29.673870289))
            ThreePointArc((-56.140105291, -29.673870289), (-54.99261314, -31.75), (-53.768378144, -33.781822209))
        make_face()
        with BuildLine():
            ThreePointArc((-56.140105291, 29.673870289), (-55.268247185, 31.90913739), (-53.768378144, 33.781822209))
            ThreePointArc((-53.768378144, 33.781822209), (-54.99261314, 31.75), (-56.140105291, 29.673870289))
        make_face()
        with BuildLine():
            ThreePointArc((-2.371727147, 63.455692498), (0, 63.81827478), (2.371727147, 63.455692498))
            ThreePointArc((2.371727147, 63.455692498), (0, 63.5), (-2.371727147, 63.455692498))
        make_face()
        with BuildLine():
            ThreePointArc((53.768378144, 33.781822209), (55.268247185, 31.90913739), (56.140105291, 29.673870289))
            ThreePointArc((56.140105291, 29.673870289), (54.99261314, 31.75), (53.768378144, 33.781822209))
        make_face()
    extrude(amount=BOSS_EXTRUDE19_DEPTH)

    # Sketch18 → Boss-Extrude20 (add, through all)
    # profile 1 of 6: a face of its own
    with BuildSketch(Plane.XZ):
        with BuildLine():
            Line((-3.81, -60.579), (-3.81, -62.113257844))
            ThreePointArc((-3.81, -62.113257844), (0, -62.23), (3.81, -62.113257844))
            Line((3.81, -62.113257844), (3.81, -60.579))
            ThreePointArc((3.81, -60.579), (0, -56.769), (-3.81, -60.579))
        make_face()
        with Locations(Location((0, -60.579, 0), (0, 0, 270))):
            Circle(SKETCH18_R, mode=Mode.SUBTRACT)
    # profile 2 of 6: a face of its own
    with BuildSketch(Plane.XZ):
        with BuildLine():
            Line((-54.367952936, -26.989943212), (-55.696659205, -27.757072134))
            ThreePointArc((-55.696659205, -27.757072134), (-53.892760878, -31.115), (-51.886659205, -34.35618571))
            Line((-51.886659205, -34.35618571), (-50.557952936, -33.589056788))
            ThreePointArc((-50.557952936, -33.589056788), (-49.163396147, -28.3845), (-54.367952936, -26.989943212))
        make_face()
        with Locations(Location((-52.462952936, -30.2895, 0), (0, 0, 270))):
            Circle(SKETCH18_R, mode=Mode.SUBTRACT)
    # profile 3 of 6: a face of its own
    with BuildSketch(Plane.XZ):
        with BuildLine():
            Line((-50.557952936, 33.589056788), (-51.886659205, 34.35618571))
            ThreePointArc((-51.886659205, 34.35618571), (-53.892760878, 31.115), (-55.696659205, 27.757072134))
            Line((-55.696659205, 27.757072134), (-54.367952936, 26.989943212))
            ThreePointArc((-54.367952936, 26.989943212), (-49.163396147, 28.3845), (-50.557952936, 33.589056788))
        make_face()
        with Locations(Location((-52.462952936, 30.2895, 0), (0, 0, 270))):
            Circle(SKETCH18_R, mode=Mode.SUBTRACT)
    # profile 4 of 6: a face of its own
    with BuildSketch(Plane.XZ):
        with BuildLine():
            Line((3.81, 60.579), (3.81, 62.113257844))
            ThreePointArc((3.81, 62.113257844), (0, 62.23), (-3.81, 62.113257844))
            Line((-3.81, 62.113257844), (-3.81, 60.579))
            ThreePointArc((-3.81, 60.579), (0, 56.769), (3.81, 60.579))
        make_face()
        with Locations(Location((0, 60.579, 0), (0, 0, 270))):
            Circle(SKETCH18_R, mode=Mode.SUBTRACT)
    # profile 5 of 6: a face of its own
    with BuildSketch(Plane.XZ):
        with BuildLine():
            Line((54.367952936, 26.989943212), (55.696659205, 27.757072134))
            ThreePointArc((55.696659205, 27.757072134), (53.892760878, 31.115), (51.886659205, 34.35618571))
            Line((51.886659205, 34.35618571), (50.557952936, 33.589056788))
            ThreePointArc((50.557952936, 33.589056788), (49.163396147, 28.3845), (54.367952936, 26.989943212))
        make_face()
        with Locations(Location((52.462952936, 30.2895, 0), (0, 0, 270))):
            Circle(SKETCH18_R, mode=Mode.SUBTRACT)
    # profile 6 of 6: a face of its own
    with BuildSketch(Plane.XZ):
        with BuildLine():
            Line((50.557952936, -33.589056788), (51.886659205, -34.35618571))
            ThreePointArc((51.886659205, -34.35618571), (53.892760878, -31.115), (55.696659205, -27.757072134))
            Line((55.696659205, -27.757072134), (54.367952936, -26.989943212))
            ThreePointArc((54.367952936, -26.989943212), (49.163396147, -28.3845), (50.557952936, -33.589056788))
        make_face()
        with Locations(Location((52.462952936, -30.2895, 0), (0, 0, 270))):
            Circle(SKETCH18_R, mode=Mode.SUBTRACT)
    extrude(amount=BOSS_EXTRUDE20_DEPTH)

    # Sketch19 → Cut-Extrude4 (cut, symmetric)
    with BuildSketch(Plane.XY.offset(-62.113257844)):
        with Locations((0, -10.541)):
            Rectangle(SKETCH19_W, SKETCH19_H)
    cut_extrude4 = extrude(amount=CUT_EXTRUDE4_DEPTH, both=True, mode=Mode.SUBTRACT)

    # CirPattern1: Cut-Extrude4 ×6 about axis
    cirpattern1_axis = Axis((0, 0, 0), (0, 1, 0))
    for i in range(1, CIRPATTERN1_COUNT):
        add(cut_extrude4.rotate(cirpattern1_axis, i * 360 / CIRPATTERN1_COUNT), mode=Mode.SUBTRACT)

    # Sketch21 → Cut-Extrude6 (cut)
    with BuildSketch(Plane.XZ):
        with Locations(Location((15.494, -73.66, 0), (0, 0, 270))):
            Circle(SKETCH21_R)
        with Locations(Location((-15.494, -73.66, 0), (0, 0, 270))):
            Circle(SKETCH21_R)
    extrude(amount=-CUT_EXTRUDE6_DEPTH, mode=Mode.SUBTRACT)

    # Fillet2
    # the kernel refuses this fillet: 68.58 mm, written as the material it adds along each edge
    with BuildSketch(Plane(origin=(20.32, 0, -73.440708058), x_dir=(0.8939637768397252, 0, 0.44813922579757975), z_dir=(0, 1, 0))) as fillet2_piece_1:
        with BuildLine():
            CenterArc((42.764322506, 67.283569635), FILLET2_R, 210.97745601, 47.8641928)
            Line((-16.034104191, 31.985390957), (-17.210072725, 31.279427384))
            ThreePointArc((-17.210072725, 31.279427384), (-9.243212812, 15.378027717), (-1.226160716, -0.614667762))
            Line((-1.226160716, -0.614667762), (0.265433726, -1.345671393))
            ThreePointArc((0.265433726, -1.345671393), (14.746318106, 0.068878183), (29.227202485, -1.345671393))
            Line((29.227202485, -1.345671393), (29.492636211, 0))
        make_face()
    extrude(amount=5.08)
    with BuildSketch(Plane(origin=(-20.32, 0, -73.440708058), x_dir=(0, 0, -1), z_dir=(0, 1, 0))) as fillet2_piece_2:
        with BuildLine():
            CenterArc((40.984703651, 68.382162067), FILLET2_R, 217.782712335, 47.8641928)
            Line((-13.216807158, 26.365348456), (-14.300837375, 25.525012184))
            ThreePointArc((-14.300837375, 25.525012184), (-6.546828979, 13.213541244), (-1.321932745, -0.36576))
            Line((-1.321932745, -0.36576), (0, -1.3716))
            ThreePointArc((0, -1.3716), (17.889645971, -1.3716), (35.675183708, -1.367643241))
            Line((35.675183708, -1.367643241), (35.779291942, 0))
        make_face()
    extrude(amount=5.08)


solid = part.part
